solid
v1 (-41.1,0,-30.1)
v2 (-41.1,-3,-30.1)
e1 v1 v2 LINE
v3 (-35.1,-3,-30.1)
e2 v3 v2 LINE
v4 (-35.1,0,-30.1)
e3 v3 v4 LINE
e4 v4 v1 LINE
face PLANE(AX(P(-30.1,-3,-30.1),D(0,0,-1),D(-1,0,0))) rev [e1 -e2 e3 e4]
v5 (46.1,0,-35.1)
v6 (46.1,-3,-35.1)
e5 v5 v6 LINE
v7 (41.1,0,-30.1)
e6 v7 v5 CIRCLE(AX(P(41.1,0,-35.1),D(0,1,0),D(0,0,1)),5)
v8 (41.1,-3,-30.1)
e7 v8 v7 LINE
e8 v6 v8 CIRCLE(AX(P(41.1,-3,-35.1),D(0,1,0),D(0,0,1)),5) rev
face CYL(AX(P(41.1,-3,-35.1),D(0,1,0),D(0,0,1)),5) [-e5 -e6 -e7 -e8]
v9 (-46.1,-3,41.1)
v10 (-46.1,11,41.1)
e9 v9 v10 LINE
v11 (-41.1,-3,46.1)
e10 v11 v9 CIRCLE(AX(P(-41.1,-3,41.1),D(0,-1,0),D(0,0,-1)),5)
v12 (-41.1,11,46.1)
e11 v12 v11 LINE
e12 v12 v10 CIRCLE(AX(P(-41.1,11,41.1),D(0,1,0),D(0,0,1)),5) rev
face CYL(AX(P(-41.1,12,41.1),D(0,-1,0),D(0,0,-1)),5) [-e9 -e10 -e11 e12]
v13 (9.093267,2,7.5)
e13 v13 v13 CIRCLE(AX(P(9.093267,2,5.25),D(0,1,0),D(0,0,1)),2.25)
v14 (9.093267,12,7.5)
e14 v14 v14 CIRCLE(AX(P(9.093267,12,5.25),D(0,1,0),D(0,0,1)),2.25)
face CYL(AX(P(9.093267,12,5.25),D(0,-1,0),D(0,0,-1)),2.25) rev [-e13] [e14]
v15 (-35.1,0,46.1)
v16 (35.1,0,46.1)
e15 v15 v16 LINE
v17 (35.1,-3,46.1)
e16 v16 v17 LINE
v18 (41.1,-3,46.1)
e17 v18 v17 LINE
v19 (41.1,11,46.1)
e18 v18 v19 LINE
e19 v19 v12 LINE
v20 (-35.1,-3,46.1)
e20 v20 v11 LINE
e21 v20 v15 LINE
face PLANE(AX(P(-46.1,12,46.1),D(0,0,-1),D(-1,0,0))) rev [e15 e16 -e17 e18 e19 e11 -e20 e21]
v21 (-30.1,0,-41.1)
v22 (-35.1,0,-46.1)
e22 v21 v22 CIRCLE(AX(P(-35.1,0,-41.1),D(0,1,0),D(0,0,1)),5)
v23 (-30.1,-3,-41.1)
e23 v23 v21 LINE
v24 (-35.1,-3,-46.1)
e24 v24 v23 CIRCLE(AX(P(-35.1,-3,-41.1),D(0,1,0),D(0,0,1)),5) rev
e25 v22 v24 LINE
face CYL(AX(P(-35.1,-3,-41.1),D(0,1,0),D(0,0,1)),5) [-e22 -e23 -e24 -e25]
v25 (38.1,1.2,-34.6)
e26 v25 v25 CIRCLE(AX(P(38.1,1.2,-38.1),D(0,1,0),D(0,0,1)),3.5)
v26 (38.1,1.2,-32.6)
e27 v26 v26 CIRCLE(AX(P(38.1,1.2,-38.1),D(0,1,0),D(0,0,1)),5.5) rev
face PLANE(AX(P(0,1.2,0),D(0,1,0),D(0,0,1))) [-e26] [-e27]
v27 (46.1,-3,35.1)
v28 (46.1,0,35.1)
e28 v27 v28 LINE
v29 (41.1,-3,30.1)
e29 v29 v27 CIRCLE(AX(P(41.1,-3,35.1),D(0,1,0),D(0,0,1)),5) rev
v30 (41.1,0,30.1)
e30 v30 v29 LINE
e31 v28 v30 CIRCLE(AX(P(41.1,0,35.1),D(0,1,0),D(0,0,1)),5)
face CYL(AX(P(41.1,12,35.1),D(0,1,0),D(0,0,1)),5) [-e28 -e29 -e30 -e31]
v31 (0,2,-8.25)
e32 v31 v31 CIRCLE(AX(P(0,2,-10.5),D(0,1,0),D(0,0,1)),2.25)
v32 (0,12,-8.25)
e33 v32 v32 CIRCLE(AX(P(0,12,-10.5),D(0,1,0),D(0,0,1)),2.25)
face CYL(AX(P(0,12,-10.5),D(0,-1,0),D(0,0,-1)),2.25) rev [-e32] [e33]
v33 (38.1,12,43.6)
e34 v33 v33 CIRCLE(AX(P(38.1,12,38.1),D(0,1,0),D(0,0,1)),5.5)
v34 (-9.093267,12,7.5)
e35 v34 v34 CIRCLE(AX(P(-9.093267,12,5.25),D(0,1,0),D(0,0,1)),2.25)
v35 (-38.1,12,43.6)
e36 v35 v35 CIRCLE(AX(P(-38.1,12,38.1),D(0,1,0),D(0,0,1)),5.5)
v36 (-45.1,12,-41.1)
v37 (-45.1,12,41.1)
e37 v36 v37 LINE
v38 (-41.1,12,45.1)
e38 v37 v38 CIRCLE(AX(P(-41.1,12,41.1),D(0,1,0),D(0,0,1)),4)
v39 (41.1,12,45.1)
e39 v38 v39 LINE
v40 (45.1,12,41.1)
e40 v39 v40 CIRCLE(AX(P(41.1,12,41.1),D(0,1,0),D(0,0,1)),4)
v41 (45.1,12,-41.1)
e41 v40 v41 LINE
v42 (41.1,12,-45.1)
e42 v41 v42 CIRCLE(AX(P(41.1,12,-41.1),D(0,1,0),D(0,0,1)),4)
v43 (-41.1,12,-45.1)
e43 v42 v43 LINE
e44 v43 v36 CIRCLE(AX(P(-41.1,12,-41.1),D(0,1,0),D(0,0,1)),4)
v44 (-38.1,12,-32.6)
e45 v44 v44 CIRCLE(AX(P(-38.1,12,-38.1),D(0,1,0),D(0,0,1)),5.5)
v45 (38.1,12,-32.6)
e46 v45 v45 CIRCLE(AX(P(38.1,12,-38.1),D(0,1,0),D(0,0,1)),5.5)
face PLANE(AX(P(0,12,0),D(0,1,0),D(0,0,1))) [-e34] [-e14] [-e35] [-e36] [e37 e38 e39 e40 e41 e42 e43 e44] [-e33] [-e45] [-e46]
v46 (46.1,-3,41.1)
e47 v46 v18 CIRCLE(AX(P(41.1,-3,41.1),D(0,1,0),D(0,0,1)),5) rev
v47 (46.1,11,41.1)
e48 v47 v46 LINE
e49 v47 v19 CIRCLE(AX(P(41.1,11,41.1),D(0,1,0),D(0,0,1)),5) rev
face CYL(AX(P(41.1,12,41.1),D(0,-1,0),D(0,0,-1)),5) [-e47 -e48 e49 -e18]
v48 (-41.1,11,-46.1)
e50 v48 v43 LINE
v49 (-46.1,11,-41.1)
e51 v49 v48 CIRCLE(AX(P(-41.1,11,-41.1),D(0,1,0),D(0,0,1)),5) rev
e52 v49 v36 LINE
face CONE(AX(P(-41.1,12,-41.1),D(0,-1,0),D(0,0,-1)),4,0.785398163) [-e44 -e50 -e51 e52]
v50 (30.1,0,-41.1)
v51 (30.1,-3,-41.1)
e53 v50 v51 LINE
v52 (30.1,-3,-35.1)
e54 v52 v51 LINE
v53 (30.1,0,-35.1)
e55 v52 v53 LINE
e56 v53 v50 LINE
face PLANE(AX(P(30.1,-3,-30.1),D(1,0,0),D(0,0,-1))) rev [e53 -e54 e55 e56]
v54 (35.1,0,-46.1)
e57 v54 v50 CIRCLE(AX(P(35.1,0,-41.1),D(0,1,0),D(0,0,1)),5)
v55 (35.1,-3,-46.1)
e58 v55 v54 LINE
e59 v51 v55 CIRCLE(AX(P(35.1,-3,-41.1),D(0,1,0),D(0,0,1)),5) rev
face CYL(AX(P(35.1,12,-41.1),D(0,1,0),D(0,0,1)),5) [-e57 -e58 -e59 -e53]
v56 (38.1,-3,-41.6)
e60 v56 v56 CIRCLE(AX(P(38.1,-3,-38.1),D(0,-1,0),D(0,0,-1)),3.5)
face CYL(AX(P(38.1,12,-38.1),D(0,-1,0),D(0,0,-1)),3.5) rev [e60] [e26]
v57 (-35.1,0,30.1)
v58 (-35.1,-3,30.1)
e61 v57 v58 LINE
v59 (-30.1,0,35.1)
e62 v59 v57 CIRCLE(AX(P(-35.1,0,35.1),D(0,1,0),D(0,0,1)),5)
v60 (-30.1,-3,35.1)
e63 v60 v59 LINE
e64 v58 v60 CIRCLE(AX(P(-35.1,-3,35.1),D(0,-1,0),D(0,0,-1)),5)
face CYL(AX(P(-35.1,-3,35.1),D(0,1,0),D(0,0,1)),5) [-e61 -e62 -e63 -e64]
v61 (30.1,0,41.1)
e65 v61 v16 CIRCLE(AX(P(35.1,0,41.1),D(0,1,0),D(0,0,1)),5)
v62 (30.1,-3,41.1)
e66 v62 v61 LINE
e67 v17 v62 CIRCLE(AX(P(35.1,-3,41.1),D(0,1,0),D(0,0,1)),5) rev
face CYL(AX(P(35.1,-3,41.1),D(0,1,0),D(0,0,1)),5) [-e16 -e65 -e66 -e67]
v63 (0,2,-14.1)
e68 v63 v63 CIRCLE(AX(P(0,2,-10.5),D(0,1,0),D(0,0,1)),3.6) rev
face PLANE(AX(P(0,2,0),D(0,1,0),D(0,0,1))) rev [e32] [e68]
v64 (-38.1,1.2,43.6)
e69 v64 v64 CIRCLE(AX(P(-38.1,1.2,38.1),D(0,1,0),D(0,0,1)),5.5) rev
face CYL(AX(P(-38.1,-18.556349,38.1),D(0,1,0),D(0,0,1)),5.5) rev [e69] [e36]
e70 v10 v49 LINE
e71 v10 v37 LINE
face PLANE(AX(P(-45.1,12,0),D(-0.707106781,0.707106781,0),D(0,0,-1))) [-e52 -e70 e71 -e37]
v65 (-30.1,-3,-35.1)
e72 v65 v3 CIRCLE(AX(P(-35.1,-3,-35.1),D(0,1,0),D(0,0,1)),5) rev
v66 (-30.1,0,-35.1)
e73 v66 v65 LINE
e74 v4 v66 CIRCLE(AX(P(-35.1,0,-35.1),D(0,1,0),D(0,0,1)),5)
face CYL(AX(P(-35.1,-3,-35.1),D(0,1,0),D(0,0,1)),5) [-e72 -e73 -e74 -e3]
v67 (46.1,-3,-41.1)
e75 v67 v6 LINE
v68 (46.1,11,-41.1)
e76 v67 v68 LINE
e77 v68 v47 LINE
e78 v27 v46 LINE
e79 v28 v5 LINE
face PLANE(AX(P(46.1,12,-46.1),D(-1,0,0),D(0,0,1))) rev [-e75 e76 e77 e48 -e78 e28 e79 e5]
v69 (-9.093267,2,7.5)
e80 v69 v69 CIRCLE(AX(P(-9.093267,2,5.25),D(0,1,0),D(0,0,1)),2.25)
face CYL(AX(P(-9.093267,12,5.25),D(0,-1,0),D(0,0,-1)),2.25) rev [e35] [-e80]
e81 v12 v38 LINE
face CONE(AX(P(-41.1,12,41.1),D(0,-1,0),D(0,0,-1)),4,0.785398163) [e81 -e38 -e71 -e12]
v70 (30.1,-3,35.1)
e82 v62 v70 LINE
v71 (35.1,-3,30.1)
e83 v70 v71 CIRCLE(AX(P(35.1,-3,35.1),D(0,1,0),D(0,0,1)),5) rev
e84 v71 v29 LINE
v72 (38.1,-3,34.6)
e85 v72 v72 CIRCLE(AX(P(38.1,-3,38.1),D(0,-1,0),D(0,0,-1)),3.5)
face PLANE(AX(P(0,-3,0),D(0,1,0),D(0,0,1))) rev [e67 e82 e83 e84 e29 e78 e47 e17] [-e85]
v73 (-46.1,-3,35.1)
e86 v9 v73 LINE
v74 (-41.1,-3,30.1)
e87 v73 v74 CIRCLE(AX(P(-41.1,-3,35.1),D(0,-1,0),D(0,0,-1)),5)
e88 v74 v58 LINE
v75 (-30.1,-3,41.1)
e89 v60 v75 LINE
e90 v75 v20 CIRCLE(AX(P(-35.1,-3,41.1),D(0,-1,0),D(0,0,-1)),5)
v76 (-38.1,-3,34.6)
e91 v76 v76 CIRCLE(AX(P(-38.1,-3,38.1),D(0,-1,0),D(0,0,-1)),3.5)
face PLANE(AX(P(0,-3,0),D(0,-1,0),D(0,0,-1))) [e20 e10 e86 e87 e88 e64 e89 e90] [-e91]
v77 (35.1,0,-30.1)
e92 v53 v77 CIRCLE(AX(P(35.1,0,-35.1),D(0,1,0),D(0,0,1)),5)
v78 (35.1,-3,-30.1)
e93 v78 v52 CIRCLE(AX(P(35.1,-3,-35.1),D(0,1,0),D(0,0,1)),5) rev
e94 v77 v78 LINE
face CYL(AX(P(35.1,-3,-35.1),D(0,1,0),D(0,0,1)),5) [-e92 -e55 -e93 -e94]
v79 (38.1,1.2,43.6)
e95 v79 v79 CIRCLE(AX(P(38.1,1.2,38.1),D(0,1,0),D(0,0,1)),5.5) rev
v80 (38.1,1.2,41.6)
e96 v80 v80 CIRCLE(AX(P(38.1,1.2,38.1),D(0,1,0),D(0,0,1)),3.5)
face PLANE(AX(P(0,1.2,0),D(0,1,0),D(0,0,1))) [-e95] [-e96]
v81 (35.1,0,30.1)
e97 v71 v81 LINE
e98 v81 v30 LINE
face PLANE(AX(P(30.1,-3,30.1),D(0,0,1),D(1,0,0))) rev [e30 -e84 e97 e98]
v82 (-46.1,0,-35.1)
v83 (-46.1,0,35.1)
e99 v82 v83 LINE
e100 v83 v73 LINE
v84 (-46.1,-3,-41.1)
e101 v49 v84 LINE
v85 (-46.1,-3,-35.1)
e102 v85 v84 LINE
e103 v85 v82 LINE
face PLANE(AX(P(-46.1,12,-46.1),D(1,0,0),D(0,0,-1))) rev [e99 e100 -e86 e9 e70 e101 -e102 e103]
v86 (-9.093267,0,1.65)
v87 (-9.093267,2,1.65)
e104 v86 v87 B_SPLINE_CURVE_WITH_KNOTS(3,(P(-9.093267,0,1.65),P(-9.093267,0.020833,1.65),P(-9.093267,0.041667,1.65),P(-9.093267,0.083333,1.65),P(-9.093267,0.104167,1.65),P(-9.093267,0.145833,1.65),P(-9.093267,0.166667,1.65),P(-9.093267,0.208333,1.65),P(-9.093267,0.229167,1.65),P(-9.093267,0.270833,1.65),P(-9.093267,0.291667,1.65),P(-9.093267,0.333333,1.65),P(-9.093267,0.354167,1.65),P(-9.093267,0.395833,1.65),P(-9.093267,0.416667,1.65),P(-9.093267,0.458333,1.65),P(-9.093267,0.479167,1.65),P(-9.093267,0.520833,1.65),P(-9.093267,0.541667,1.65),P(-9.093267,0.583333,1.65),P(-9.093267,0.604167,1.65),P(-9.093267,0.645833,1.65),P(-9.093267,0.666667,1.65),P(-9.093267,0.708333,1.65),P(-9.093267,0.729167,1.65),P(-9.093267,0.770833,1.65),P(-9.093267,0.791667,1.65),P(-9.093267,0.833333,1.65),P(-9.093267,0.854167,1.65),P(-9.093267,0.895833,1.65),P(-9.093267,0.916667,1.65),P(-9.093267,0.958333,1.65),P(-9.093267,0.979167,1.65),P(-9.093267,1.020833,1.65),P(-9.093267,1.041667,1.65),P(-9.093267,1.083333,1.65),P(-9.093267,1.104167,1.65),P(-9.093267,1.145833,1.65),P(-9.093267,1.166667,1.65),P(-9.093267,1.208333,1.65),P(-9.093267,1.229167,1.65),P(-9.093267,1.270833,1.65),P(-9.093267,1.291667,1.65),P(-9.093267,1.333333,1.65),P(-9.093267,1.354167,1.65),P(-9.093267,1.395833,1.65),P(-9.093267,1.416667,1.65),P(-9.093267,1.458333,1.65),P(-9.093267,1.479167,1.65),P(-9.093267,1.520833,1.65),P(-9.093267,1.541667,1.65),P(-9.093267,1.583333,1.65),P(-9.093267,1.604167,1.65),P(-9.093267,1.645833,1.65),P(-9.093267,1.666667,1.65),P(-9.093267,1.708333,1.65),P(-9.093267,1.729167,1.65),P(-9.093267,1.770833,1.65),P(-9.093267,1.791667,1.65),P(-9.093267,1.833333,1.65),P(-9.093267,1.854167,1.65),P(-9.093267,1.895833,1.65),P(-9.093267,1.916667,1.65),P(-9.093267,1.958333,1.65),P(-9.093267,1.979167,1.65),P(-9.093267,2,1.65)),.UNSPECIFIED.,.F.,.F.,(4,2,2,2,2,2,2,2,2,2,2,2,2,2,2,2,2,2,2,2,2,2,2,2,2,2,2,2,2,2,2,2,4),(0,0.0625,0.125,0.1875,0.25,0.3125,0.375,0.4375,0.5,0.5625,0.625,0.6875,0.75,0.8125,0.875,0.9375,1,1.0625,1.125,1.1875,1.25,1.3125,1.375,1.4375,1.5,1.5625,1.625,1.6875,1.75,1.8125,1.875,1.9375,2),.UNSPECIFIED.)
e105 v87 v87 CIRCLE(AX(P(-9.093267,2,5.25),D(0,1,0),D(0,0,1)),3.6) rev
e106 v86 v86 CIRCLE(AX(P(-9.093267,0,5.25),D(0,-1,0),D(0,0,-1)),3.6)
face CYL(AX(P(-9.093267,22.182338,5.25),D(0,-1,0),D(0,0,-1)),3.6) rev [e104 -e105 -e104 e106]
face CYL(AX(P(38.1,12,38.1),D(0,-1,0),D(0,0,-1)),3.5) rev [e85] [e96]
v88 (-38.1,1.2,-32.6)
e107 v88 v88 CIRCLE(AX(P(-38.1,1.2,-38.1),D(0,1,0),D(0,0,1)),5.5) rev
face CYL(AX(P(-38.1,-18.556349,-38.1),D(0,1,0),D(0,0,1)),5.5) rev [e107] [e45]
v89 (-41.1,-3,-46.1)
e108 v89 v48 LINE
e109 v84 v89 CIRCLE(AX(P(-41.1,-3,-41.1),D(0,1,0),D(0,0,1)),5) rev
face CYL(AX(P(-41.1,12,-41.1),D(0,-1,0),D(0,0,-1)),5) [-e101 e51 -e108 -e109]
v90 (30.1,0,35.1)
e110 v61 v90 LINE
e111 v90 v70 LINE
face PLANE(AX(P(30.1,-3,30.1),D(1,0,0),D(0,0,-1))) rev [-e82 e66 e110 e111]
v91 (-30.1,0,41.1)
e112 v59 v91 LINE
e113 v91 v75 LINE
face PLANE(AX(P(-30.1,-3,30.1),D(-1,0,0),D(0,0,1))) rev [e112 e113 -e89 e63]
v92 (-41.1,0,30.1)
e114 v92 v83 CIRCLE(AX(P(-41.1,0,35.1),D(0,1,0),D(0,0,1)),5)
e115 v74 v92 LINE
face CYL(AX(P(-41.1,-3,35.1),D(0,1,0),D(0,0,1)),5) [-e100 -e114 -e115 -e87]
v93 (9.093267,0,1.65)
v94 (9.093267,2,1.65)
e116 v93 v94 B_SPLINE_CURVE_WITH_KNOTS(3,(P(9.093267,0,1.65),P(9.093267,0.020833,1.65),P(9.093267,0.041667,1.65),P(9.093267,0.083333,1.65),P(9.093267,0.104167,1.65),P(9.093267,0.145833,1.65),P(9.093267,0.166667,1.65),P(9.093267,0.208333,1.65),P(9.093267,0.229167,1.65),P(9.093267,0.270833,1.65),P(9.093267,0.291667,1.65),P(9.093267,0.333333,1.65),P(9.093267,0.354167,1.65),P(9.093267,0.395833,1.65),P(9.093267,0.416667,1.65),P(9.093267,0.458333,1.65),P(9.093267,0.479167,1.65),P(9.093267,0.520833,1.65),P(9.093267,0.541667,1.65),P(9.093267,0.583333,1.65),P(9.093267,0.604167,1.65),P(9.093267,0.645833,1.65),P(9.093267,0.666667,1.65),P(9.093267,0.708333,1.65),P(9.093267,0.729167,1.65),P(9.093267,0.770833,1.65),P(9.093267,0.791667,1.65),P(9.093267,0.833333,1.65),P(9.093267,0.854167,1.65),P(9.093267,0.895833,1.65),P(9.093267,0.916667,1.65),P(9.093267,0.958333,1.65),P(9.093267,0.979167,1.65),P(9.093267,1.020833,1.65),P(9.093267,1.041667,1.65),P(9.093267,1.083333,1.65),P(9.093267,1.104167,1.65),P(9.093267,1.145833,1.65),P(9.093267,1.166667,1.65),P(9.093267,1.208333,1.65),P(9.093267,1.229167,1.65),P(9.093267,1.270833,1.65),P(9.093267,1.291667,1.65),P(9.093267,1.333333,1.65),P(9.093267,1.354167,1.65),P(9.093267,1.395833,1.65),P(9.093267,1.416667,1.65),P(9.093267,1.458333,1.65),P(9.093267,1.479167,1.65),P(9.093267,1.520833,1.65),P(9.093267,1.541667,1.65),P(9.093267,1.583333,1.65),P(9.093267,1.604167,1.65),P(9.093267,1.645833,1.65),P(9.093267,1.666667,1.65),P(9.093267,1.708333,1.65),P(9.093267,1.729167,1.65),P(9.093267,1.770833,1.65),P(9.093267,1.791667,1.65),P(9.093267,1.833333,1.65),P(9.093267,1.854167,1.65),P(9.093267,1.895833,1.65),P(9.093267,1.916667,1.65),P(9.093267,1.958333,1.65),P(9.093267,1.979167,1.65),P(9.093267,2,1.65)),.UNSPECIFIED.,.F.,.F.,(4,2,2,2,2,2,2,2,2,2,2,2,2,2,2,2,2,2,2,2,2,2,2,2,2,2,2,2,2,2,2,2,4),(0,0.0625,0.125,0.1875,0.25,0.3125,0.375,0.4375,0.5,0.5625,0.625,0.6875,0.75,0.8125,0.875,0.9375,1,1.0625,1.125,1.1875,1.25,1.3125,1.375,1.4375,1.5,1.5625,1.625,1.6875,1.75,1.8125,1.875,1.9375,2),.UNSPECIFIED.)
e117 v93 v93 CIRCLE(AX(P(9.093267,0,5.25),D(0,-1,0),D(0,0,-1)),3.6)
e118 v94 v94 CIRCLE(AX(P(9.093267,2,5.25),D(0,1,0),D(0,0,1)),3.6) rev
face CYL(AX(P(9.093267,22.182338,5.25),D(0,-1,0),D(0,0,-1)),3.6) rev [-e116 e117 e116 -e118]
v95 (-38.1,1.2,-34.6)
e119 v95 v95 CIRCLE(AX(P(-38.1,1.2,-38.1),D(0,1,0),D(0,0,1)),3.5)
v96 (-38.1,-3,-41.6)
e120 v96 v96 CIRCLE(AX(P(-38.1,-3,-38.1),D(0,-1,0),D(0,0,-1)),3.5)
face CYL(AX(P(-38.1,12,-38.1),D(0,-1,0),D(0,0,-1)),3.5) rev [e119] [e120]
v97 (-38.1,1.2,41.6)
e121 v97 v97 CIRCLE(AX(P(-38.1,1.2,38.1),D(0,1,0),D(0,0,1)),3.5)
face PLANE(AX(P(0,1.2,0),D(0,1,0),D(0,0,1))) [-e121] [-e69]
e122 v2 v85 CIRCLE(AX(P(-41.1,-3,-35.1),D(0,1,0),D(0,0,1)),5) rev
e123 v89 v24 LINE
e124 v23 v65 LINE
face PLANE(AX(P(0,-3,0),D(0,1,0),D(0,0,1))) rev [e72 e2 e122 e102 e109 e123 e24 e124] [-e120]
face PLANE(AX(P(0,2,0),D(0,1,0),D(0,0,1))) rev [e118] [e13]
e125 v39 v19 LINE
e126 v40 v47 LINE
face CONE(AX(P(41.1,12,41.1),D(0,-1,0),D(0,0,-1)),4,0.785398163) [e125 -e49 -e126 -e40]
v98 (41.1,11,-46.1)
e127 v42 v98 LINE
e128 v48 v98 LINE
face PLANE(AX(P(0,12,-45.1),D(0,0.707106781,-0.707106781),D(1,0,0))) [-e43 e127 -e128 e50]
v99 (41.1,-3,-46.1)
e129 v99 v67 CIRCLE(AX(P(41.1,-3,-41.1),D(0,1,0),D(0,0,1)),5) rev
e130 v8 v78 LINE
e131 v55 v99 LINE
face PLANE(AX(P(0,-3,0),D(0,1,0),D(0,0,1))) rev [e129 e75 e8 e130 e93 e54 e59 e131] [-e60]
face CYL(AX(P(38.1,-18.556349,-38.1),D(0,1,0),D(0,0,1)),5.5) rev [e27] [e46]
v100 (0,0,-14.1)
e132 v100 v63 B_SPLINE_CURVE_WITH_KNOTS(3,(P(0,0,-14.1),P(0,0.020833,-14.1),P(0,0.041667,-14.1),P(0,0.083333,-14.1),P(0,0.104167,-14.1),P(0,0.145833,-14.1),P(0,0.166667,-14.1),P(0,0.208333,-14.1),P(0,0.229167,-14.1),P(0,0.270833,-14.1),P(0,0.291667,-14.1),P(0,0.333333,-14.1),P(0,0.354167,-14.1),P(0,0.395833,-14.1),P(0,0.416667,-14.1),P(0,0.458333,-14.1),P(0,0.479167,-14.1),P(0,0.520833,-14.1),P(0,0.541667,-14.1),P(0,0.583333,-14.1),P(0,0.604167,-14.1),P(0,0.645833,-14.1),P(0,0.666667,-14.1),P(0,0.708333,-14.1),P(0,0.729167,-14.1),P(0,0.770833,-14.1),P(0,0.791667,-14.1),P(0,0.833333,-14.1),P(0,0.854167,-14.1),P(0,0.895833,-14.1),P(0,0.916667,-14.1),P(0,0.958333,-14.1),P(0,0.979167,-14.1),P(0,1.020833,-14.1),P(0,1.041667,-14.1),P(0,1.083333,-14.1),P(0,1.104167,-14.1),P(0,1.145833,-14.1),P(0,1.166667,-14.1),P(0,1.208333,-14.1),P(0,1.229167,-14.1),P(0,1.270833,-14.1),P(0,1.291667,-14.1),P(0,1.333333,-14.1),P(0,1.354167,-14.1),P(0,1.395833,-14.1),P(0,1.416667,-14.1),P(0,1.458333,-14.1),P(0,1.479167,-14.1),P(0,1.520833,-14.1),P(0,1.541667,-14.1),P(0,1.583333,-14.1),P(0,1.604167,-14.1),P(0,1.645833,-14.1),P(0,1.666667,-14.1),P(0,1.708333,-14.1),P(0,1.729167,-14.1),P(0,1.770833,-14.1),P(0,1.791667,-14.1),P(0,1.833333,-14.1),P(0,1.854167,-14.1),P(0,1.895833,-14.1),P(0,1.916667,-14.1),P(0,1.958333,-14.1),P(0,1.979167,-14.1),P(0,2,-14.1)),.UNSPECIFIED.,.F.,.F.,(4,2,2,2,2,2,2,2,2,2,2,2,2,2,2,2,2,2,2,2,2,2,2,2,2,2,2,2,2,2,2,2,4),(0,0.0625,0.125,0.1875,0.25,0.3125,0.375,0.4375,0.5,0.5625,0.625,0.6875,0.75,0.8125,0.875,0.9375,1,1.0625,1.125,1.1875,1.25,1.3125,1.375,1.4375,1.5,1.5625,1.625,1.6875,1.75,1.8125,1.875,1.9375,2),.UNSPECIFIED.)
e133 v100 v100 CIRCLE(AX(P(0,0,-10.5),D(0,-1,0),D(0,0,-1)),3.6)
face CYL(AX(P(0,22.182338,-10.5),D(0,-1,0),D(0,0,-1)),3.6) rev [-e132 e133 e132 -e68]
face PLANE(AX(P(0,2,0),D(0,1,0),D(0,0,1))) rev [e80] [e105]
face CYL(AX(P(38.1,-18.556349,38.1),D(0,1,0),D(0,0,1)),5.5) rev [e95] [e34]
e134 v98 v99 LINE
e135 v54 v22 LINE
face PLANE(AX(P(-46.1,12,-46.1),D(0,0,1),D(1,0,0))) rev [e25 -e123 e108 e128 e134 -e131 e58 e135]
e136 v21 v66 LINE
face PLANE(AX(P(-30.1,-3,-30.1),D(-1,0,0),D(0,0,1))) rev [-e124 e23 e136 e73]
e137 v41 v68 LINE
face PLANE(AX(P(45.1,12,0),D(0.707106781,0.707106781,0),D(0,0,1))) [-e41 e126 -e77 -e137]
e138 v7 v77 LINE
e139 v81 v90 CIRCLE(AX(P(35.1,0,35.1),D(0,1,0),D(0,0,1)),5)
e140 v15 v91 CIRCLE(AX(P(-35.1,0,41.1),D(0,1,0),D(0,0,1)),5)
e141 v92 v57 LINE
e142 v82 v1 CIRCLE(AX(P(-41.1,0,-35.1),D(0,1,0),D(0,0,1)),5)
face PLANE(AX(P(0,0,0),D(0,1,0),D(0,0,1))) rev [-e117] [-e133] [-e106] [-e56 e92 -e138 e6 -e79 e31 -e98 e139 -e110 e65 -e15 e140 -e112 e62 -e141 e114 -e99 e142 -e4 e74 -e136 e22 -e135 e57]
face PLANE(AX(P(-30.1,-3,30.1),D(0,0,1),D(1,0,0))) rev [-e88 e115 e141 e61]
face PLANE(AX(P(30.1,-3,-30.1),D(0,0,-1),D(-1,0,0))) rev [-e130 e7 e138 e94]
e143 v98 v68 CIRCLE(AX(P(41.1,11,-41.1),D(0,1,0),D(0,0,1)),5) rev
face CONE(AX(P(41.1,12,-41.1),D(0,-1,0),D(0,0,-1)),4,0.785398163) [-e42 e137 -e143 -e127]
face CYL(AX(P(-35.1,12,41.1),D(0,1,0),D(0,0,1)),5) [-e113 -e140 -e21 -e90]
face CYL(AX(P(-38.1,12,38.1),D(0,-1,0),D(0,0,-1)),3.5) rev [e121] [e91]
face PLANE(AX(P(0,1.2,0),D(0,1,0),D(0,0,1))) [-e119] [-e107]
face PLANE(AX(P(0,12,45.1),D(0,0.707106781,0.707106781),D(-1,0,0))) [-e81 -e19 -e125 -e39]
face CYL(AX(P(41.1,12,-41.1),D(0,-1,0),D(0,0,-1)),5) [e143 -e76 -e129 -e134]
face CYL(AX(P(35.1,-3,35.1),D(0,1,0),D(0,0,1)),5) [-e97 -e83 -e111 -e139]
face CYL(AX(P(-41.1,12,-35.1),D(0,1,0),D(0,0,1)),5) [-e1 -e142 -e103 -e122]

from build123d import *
from build123d.topology import SkipClean

# Parameters (mm, degrees)
SKETCH_1_W          = 92.2
SKETCH_1_H          = 92.2
SKETCH_1_R          = 2.25
SKETCH_1_R_2        = 3.5
EXTRUDE_1_DEPTH     = 12
SKETCH_2_R          = 3.6
CUT_EXTRUDE_1_DEPTH = 2
EXTRUDE_START       = 3
SKETCH_3_W          = 16
SKETCH_3_H          = 16
SKETCH_3_R          = 3.5
EXTRUDE_2_DEPTH     = 3
SKETCH_4_R          = 5.5
CUT_EXTRUDE_2_DEPTH = 10.8
FILLET_START        = -4
FILLET_1_DEPTH      = 17
FILLET_1_2_DEPTH    = 4
CHAMFER_1_SIZE      = 1


with BuildPart() as part:
    # Эскиз1 → Бобышка-Вытянуть1 (new body)
    with BuildSketch(Plane(origin=(0, 0, 0), x_dir=(1, 0, 0), z_dir=(0, 1, 0))):
        Rectangle(SKETCH_1_W, SKETCH_1_H)
        with Locations(Location((0, 10.5, 0), (0, 0, 270))):
            Circle(SKETCH_1_R, mode=Mode.SUBTRACT)
        with Locations(Location((-38.1, 38.1, 0), (0, 0, 270))):
            Circle(SKETCH_1_R_2, mode=Mode.SUBTRACT)
        with Locations(Location((38.1, 38.1, 0), (0, 0, 270))):
            Circle(SKETCH_1_R_2, mode=Mode.SUBTRACT)
        with Locations(Location((38.1, -38.1, 0), (0, 0, 270))):
            Circle(SKETCH_1_R_2, mode=Mode.SUBTRACT)
        with Locations(Location((-38.1, -38.1, 0), (0, 0, 270))):
            Circle(SKETCH_1_R_2, mode=Mode.SUBTRACT)
        with Locations(Location((9.09326674, -5.25, 0), (0, 0, 270))):
            Circle(SKETCH_1_R, mode=Mode.SUBTRACT)
        with Locations(Location((-9.09326674, -5.25, 0), (0, 0, 270))):
            Circle(SKETCH_1_R, mode=Mode.SUBTRACT)
    extrude(amount=EXTRUDE_1_DEPTH)

    # Эскиз2 → Вырез-Вытянуть1 (cut)
    with BuildSketch(Plane.XZ):
        with Locations(Location((-9.09326674, 5.25, 0), (0, 0, 270))):
            Circle(SKETCH_2_R)
        with Locations(Location((9.09326674, 5.25, 0), (0, 0, 270))):
            Circle(SKETCH_2_R)
        with Locations(Location((0, -10.5, 0), (0, 0, 270))):
            Circle(SKETCH_2_R)
    extrude(amount=-CUT_EXTRUDE_1_DEPTH, mode=Mode.SUBTRACT)

    # Эскиз3 → Бобышка-Вытянуть2 (add)
    # profile 1 of 4: a face of its own
    with SkipClean():  # the faces are left unmerged after this step: merging them gives an invalid solid
        with BuildSketch(Plane.XZ.offset(EXTRUDE_START)):
            with Locations((38.1, 38.1)):
                Rectangle(SKETCH_3_W, SKETCH_3_H)
            with Locations(Location((38.1, 38.1, 0), (0, 0, 270))):
                Circle(SKETCH_3_R, mode=Mode.SUBTRACT)
        # profile 2 of 4: a face of its own
        with BuildSketch(Plane.XZ.offset(EXTRUDE_START)):
            with Locations((-38.1, 38.1)):
                Rectangle(SKETCH_3_W, SKETCH_3_H)
            with Locations(Location((-38.1, 38.1, 0), (0, 0, 270))):
                Circle(SKETCH_3_R, mode=Mode.SUBTRACT)
        # profile 3 of 4: a face of its own
        with BuildSketch(Plane.XZ.offset(EXTRUDE_START)):
            with Locations((38.1, -38.1)):
                Rectangle(SKETCH_3_W, SKETCH_3_H)
            with Locations(Location((38.1, -38.1, 0), (0, 0, 270))):
                Circle(SKETCH_3_R, mode=Mode.SUBTRACT)
        # profile 4 of 4: a face of its own
        with BuildSketch(Plane.XZ.offset(EXTRUDE_START)):
            with Locations((-38.1, -38.1)):
                Rectangle(SKETCH_3_W, SKETCH_3_H)
            with Locations(Location((-38.1, -38.1, 0), (0, 0, 270))):
                Circle(SKETCH_3_R, mode=Mode.SUBTRACT)
        extrude(amount=-EXTRUDE_2_DEPTH)

    # Эскиз4 → Вырез-Вытянуть2 (cut)
    with BuildSketch(Plane(origin=(0, 12, 0), x_dir=(1, 0, 0), z_dir=(0, 1, 0))):
        with Locations(Location((38.1, 38.1, 0), (0, 0, 270))):
            Circle(SKETCH_4_R)
        with Locations(Location((38.1, -38.1, 0), (0, 0, 270))):
            Circle(SKETCH_4_R)
        with Locations(Location((-38.1, -38.1, 0), (0, 0, 270))):
            Circle(SKETCH_4_R)
        with Locations(Location((-38.1, 38.1, 0), (0, 0, 270))):
            Circle(SKETCH_4_R)
    extrude(amount=-CUT_EXTRUDE_2_DEPTH, mode=Mode.SUBTRACT)

    # Скругление1: read off the stored shape, not the designer's step
    # Скругление1 outline → Скругление1 (cut)
    with BuildSketch(Plane(origin=(0, 0, 0), x_dir=(1, 0, 0), z_dir=(0, 1, 0)).offset(FILLET_START)):
        with BuildLine():
            Line((-46.1, -46.1), (-41.1, -46.1))
            ThreePointArc((-41.1, -46.1), (-44.635533906, -44.635533906), (-46.1, -41.1))
            Line((-46.1, -41.1), (-46.1, -46.1))
        make_face()
        with BuildLine():
            ThreePointArc((46.1, -41.1), (44.635533906, -44.635533906), (41.1, -46.1))
            Line((41.1, -46.1), (46.1, -46.1))
            Line((46.1, -46.1), (46.1, -41.1))
        make_face()
        with BuildLine():
            Line((-46.1, 46.1), (-46.1, 41.1))
            ThreePointArc((-46.1, 41.1), (-44.635533906, 44.635533906), (-41.1, 46.1))
            Line((-41.1, 46.1), (-46.1, 46.1))
        make_face()
        with BuildLine():
            ThreePointArc((41.1, 46.1), (44.635533906, 44.635533906), (46.1, 41.1))
            Line((46.1, 41.1), (46.1, 46.1))
            Line((46.1, 46.1), (41.1, 46.1))
        make_face()
    extrude(amount=FILLET_1_DEPTH, mode=Mode.SUBTRACT)

    # Fillet 1 2 outline → Fillet 1 2 (cut)
    with BuildSketch(Plane(origin=(0, 0, 0), x_dir=(1, 0, 0), z_dir=(0, 1, 0)).offset(FILLET_START)):
        with BuildLine():
            ThreePointArc((-30.1, -41.1), (-31.564466094, -44.635533906), (-35.1, -46.1))
            Line((-35.1, -46.1), (-30.1, -46.1))
            Line((-30.1, -46.1), (-30.1, -41.1))
        make_face()
        with BuildLine():
            ThreePointArc((-35.1, -30.1), (-31.564466094, -31.564466094), (-30.1, -35.1))
            Line((-30.1, -35.1), (-30.1, -30.1))
            Line((-30.1, -30.1), (-35.1, -30.1))
        make_face()
        with BuildLine():
            Line((30.1, -41.1), (30.1, -46.1))
            Line((30.1, -46.1), (35.1, -46.1))
            ThreePointArc((35.1, -46.1), (31.564466094, -44.635533906), (30.1, -41.1))
        make_face()
        with BuildLine():
            Line((-46.1, -30.1), (-46.1, -35.1))
            ThreePointArc((-46.1, -35.1), (-44.635533906, -31.564466094), (-41.1, -30.1))
            Line((-41.1, -30.1), (-46.1, -30.1))
        make_face()
        with BuildLine():
            Line((30.1, -30.1), (30.1, -35.1))
            ThreePointArc((30.1, -35.1), (31.564466094, -31.564466094), (35.1, -30.1))
            Line((35.1, -30.1), (30.1, -30.1))
        make_face()
        with BuildLine():
            Line((-46.1, 35.1), (-46.1, 30.1))
            Line((-46.1, 30.1), (-41.1, 30.1))
            ThreePointArc((-41.1, 30.1), (-44.635533906, 31.564466094), (-46.1, 35.1))
        make_face()
        with BuildLine():
            Line((46.1, -30.1), (41.1, -30.1))
            ThreePointArc((41.1, -30.1), (44.635533906, -31.564466094), (46.1, -35.1))
            Line((46.1, -35.1), (46.1, -30.1))
        make_face()
        with BuildLine():
            ThreePointArc((-30.1, 35.1), (-31.564466094, 31.564466094), (-35.1, 30.1))
            Line((-35.1, 30.1), (-30.1, 30.1))
            Line((-30.1, 30.1), (-30.1, 35.1))
        make_face()
        with BuildLine():
            Line((41.1, 30.1), (46.1, 30.1))
            Line((46.1, 30.1), (46.1, 35.1))
            ThreePointArc((46.1, 35.1), (44.635533906, 31.564466094), (41.1, 30.1))
        make_face()
        with BuildLine():
            ThreePointArc((-35.1, 46.1), (-31.564466094, 44.635533906), (-30.1, 41.1))
            Line((-30.1, 41.1), (-30.1, 46.1))
            Line((-30.1, 46.1), (-35.1, 46.1))
        make_face()
        with BuildLine():
            Line((30.1, 30.1), (35.1, 30.1))
            ThreePointArc((35.1, 30.1), (31.564466094, 31.564466094), (30.1, 35.1))
            Line((30.1, 35.1), (30.1, 30.1))
        make_face()
        with BuildLine():
            Line((35.1, 46.1), (30.1, 46.1))
            Line((30.1, 46.1), (30.1, 41.1))
            ThreePointArc((30.1, 41.1), (31.564466094, 44.635533906), (35.1, 46.1))
        make_face()
    extrude(amount=FILLET_1_2_DEPTH, mode=Mode.SUBTRACT)

    # Фаска1
    chamfer_1_edges = [part.edges().sort_by_distance(p)[0] for p in [
        (0, 12, 46.1),
        (-46.1, 12, 0),
        (0, 12, -46.1),
        (46.1, 12, 0),
        (44.635533906, 12, 44.635533906),
        (-44.635533906, 12, 44.635533906),
        (44.635533906, 12, -44.635533906),
        (-44.635533906, 12, -44.635533906),
    ]]
    chamfer(chamfer_1_edges, length=CHAMFER_1_SIZE)


solid = part.part
